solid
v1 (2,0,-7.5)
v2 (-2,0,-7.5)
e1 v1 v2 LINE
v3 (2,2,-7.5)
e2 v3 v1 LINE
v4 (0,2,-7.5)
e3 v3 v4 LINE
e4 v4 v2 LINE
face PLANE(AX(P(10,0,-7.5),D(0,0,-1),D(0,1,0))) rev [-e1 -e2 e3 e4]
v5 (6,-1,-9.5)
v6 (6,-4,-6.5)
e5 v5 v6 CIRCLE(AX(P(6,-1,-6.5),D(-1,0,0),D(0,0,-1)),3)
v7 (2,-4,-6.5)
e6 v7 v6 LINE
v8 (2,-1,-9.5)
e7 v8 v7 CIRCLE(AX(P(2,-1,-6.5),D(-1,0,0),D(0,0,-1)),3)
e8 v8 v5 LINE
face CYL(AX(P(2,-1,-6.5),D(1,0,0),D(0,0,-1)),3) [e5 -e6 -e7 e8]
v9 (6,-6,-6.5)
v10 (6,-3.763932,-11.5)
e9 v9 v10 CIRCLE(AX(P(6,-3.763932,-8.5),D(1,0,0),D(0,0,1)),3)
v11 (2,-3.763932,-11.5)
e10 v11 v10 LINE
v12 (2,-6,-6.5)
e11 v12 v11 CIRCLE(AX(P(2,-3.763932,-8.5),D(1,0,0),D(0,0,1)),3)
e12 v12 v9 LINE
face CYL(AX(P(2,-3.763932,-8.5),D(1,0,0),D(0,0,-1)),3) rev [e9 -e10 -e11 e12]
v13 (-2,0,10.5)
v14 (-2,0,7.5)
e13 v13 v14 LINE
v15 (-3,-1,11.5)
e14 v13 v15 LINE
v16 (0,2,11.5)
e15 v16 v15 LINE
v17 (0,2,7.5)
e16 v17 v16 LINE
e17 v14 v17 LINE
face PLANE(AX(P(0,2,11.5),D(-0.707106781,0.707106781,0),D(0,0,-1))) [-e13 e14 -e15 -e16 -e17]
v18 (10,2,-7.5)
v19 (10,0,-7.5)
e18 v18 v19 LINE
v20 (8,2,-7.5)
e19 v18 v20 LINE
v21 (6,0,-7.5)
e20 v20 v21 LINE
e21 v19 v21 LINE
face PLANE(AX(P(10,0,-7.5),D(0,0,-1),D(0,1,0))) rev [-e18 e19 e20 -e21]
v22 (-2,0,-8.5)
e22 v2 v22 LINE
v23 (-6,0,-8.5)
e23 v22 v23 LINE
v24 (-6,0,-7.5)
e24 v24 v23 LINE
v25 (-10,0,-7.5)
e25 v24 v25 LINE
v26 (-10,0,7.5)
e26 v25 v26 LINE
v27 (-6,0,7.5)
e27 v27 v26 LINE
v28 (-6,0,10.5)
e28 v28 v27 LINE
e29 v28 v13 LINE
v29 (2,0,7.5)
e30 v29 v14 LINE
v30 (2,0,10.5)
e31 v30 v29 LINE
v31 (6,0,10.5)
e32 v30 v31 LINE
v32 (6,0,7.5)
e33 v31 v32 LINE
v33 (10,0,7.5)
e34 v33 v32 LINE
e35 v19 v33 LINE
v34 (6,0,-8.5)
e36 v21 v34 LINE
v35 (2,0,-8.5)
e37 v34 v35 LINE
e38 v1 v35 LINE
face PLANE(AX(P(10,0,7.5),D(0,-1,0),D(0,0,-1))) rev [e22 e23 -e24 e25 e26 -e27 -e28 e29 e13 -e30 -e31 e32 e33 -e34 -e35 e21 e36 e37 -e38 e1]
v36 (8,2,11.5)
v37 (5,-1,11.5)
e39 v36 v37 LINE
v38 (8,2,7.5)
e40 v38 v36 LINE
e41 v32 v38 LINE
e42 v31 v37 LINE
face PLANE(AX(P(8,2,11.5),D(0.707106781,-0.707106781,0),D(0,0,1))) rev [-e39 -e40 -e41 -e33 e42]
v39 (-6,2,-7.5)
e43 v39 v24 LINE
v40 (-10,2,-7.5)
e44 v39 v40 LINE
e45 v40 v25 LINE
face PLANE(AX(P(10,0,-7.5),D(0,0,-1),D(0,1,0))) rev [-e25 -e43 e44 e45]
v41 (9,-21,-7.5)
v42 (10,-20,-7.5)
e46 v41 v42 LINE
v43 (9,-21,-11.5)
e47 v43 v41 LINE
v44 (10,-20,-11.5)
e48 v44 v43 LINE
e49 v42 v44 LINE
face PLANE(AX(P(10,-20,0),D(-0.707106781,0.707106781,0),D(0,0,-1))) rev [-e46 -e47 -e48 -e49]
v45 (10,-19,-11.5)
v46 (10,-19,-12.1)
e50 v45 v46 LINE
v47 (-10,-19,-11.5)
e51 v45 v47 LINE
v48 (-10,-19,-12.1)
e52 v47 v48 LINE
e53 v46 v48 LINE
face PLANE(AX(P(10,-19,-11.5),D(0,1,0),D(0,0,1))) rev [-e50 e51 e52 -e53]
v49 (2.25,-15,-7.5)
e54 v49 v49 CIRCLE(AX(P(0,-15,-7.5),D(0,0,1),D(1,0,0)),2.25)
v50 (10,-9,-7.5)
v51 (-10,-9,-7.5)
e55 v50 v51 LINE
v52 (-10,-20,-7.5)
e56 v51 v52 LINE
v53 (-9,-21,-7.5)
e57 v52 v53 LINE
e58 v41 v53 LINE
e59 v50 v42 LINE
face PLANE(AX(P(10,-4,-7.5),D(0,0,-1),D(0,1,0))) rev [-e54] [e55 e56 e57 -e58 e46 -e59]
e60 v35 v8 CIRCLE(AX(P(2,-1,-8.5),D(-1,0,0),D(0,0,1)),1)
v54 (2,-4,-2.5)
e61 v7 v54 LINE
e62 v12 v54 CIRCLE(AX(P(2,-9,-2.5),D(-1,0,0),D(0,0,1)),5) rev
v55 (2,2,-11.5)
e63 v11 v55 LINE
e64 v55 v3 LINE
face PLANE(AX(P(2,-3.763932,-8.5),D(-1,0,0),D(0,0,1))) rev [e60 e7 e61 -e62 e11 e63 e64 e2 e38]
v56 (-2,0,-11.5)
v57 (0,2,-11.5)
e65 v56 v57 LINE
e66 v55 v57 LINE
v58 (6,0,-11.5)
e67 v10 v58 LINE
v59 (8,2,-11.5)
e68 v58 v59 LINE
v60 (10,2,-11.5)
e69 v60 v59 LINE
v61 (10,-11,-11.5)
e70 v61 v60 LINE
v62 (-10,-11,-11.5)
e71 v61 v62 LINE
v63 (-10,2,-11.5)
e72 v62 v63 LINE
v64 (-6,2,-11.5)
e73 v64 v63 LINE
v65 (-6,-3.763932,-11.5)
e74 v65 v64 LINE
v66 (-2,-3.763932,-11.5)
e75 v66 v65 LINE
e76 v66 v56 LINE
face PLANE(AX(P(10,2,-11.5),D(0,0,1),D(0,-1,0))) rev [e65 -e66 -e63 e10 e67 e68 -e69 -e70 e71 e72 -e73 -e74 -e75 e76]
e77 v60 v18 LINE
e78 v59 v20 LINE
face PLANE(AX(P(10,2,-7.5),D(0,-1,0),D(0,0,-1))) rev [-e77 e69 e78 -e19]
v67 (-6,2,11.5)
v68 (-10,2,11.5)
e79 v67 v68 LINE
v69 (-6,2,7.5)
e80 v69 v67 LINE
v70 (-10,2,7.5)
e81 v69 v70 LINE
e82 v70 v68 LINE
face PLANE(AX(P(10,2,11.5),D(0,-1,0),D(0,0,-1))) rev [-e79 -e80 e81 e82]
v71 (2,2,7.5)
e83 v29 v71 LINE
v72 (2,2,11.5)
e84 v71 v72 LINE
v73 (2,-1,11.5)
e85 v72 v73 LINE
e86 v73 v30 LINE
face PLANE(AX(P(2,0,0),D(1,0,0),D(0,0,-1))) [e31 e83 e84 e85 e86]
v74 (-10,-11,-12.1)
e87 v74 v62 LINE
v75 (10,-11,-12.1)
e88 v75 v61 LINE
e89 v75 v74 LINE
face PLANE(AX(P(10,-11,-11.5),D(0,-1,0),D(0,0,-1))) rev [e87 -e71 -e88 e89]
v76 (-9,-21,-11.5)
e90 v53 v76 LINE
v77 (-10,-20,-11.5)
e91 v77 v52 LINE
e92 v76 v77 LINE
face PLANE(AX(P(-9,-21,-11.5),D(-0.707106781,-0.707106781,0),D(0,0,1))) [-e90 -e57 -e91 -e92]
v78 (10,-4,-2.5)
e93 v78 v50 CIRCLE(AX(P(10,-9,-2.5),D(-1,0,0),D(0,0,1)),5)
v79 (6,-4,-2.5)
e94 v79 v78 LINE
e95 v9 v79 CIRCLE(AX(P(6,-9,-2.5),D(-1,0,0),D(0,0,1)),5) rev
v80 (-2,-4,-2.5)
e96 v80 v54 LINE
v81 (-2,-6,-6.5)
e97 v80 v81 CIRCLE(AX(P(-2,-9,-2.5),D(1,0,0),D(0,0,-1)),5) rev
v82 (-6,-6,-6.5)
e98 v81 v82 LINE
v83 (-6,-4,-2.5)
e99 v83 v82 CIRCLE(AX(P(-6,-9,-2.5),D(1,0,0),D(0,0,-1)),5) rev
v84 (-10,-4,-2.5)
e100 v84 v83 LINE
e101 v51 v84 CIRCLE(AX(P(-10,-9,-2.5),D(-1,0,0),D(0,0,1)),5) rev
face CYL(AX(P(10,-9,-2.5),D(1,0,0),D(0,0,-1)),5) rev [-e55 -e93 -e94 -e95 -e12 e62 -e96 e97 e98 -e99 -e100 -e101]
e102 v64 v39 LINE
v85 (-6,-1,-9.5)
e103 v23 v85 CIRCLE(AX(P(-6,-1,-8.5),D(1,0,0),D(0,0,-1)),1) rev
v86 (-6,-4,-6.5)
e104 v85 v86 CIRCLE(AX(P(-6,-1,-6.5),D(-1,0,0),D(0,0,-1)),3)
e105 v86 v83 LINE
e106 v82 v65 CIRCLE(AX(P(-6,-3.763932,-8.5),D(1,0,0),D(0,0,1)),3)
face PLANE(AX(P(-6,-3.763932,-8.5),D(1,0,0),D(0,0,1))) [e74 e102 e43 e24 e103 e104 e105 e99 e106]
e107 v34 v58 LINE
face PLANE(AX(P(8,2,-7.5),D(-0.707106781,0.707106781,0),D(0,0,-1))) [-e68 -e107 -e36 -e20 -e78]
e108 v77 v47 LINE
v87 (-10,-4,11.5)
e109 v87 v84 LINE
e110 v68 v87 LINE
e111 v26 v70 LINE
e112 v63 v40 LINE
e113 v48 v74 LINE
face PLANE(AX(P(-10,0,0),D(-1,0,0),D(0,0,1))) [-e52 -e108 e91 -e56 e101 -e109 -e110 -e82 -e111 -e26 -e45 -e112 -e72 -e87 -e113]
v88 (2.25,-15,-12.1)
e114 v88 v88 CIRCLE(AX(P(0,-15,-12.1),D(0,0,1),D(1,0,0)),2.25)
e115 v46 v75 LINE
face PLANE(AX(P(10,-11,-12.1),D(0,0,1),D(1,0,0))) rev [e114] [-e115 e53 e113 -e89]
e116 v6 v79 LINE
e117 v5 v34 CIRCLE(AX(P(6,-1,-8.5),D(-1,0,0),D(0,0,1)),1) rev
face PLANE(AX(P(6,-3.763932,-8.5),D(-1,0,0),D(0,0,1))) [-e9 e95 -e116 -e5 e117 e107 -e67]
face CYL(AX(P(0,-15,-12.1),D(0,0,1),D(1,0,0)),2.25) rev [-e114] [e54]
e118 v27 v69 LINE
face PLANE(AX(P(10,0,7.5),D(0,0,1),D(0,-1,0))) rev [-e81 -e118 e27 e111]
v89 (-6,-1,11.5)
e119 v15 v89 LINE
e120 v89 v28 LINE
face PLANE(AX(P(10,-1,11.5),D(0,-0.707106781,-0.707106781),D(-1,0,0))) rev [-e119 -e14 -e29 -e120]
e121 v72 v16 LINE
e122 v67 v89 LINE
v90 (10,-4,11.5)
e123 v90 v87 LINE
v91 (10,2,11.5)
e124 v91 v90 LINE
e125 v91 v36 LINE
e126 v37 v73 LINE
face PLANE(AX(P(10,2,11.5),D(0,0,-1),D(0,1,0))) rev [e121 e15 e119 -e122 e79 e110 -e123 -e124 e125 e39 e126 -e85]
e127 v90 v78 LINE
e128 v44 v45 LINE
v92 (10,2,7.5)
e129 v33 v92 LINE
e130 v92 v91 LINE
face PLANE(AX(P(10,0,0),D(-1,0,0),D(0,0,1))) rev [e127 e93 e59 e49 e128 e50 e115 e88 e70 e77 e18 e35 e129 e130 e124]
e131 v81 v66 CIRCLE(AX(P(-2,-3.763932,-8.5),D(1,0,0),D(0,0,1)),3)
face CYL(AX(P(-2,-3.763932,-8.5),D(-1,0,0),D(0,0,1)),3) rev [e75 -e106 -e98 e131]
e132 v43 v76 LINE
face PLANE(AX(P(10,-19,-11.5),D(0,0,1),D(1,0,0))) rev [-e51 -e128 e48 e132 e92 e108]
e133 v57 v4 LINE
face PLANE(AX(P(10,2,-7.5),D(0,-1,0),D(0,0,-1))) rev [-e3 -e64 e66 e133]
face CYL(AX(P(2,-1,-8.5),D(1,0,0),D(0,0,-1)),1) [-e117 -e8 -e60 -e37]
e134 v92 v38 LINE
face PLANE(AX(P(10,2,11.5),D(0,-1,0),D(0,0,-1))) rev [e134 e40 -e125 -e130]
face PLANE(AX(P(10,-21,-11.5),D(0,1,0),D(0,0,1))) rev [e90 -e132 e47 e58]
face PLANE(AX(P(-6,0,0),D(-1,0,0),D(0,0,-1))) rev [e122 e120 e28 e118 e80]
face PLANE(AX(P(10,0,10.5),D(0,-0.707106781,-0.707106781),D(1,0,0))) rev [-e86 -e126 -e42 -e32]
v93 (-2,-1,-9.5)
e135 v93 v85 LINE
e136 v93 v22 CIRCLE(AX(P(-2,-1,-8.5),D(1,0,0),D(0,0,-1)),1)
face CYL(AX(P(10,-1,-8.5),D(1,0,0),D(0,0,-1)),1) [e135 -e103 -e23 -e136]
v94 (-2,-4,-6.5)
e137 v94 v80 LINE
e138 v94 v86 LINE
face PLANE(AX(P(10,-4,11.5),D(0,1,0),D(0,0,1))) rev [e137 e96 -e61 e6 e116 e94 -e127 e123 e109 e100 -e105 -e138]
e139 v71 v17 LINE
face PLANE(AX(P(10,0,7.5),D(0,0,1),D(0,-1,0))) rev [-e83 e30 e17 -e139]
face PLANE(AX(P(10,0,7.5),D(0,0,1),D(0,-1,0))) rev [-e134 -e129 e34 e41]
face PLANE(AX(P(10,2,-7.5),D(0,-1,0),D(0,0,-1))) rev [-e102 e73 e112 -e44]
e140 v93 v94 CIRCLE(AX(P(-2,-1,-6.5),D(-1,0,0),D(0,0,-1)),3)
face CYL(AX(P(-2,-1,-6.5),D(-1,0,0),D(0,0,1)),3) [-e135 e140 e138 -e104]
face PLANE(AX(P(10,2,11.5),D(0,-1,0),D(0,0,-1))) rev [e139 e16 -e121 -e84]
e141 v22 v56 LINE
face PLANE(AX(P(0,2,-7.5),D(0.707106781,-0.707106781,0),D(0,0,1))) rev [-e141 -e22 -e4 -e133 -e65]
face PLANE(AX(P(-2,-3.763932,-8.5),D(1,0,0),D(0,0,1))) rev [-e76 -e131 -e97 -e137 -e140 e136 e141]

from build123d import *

# Parameters (mm, degrees)
BOSS_EXTRUDE1_DEPTH  = 10
SKETCH2_R            = 2.25
CUT_EXTRUDE1_DEPTH   = 31.033314835
CHAMFER4_SIZE        = 1
FILLET1_R            = 5
CUT_EXTRUDE2_START   = 4
SKETCH3_W            = 4
SKETCH3_H            = 2
CUT_EXTRUDE2_DEPTH   = 2
FILLET2_R            = 1
FILLET2_OF_MIRROR1_R = 1
CHAMFER5_SIZE        = 2
CHAMFER6_START       = -6
CHAMFER6_DEPTH       = 4
CHAMFER6_START_2     = 2
CHAMFER6_2_DEPTH     = 4
CHAMFER6_START_3     = -1.414213562
CHAMFER6_3_DEPTH     = 2.828427124
CHAMFER6_START_4     = 4.242640687
CHAMFER6_4_DEPTH     = 1.757359313


with BuildPart() as part:
    # Sketch1 → Boss-Extrude1 (new, symmetric)
    with BuildSketch(Plane(origin=(0, 0, 0), x_dir=(0, 0, -1), z_dir=(1, 0, 0))):
        Polygon((7.5, 2), (11.5, 2), (11.5, -11), (12.1, -11), (12.1, -19), (11.5, -19), (11.5, -21), (7.5, -21), (7.5, -4), (-11.5, -4), (-11.5, 2), (-7.5, 2), (-7.5, 0), (7.5, 0), align=None)
    extrude(amount=BOSS_EXTRUDE1_DEPTH, both=True)

    # Sketch2 → Cut-Extrude1 (cut, through all)
    with BuildSketch(Plane.XY.offset(-7.5)):
        with Locations((0, -15)):
            Circle(SKETCH2_R)
    extrude(amount=-CUT_EXTRUDE1_DEPTH, mode=Mode.SUBTRACT)

    # Chamfer4
    chamfer4_edges = [part.edges().sort_by_distance(p)[0] for p in [
        (-10, -21, -9.5),
        (10, -21, -9.5),
    ]]
    chamfer(chamfer4_edges, length=CHAMFER4_SIZE)

    # Fillet1
    fillet1_edges = [part.edges().sort_by_distance(p)[0] for p in [
        (0, -4, -7.5),
    ]]
    fillet(fillet1_edges, radius=FILLET1_R)

    # Sketch3 → Cut-Extrude2 (cut, symmetric)
    with BuildSketch(Plane(origin=(0, 0, 0), x_dir=(0, 0, -1), z_dir=(1, 0, 0)).offset(CUT_EXTRUDE2_START)):
        with BuildLine():
            Line((2.5, -4), (6.5, -4))
            ThreePointArc((6.5, -4), (8.621320344, -3.121320344), (9.5, -1))
            Line((9.5, -1), (9.5, 0))
            Line((9.5, 0), (7.5, 0))
            Line((7.5, 0), (7.5, 2))
            Line((7.5, 2), (11.5, 2))
            Line((11.5, 2), (11.5, -1))
            Line((11.5, -1), (11.5, -3.763932023))
            ThreePointArc((11.5, -3.763932023), (9.724744871, -6.50254481), (6.5, -6))
            Line((6.5, -6), (2.5, -4))
        make_face()
        with Locations((-9.5, 1)):
            Rectangle(SKETCH3_W, SKETCH3_H)
    cut_extrude2 = extrude(amount=CUT_EXTRUDE2_DEPTH, both=True, mode=Mode.SUBTRACT)

    # Fillet2
    fillet2_edges = [part.edges().sort_by_distance(p)[0] for p in [
        (4, 0, -9.5),
    ]]
    fillet(fillet2_edges, radius=FILLET2_R - 0.0001)  # a hair under: the kernel refuses the full size

    # Mirror1: Cut-Extrude2 across plane
    add(cut_extrude2.mirror(Plane(origin=(0, 0, 0), x_dir=(0, 0, 1), z_dir=(1, 0, 0))), mode=Mode.SUBTRACT)

    # Fillet2 of Mirror1
    fillet2_of_mirror1_edges = [part.edges().sort_by_distance(p)[0] for p in [
        (-4, 0, -9.5),
    ]]
    fillet(fillet2_of_mirror1_edges, radius=FILLET2_OF_MIRROR1_R - 0.0001)  # a hair under: the kernel refuses the full size

    # Chamfer5
    chamfer5_edges = [part.edges().sort_by_distance(p)[0] for p in [
        (6, 2, 9.5),
        (6, 2, -9.5),
        (-2, 2, -9.5),
        (-2, 2, 9.5),
    ]]
    chamfer(chamfer5_edges, length=CHAMFER5_SIZE - 0.0001)  # a hair under: the kernel refuses the full size

    # Chamfer6: read off the stored shape, not the designer's step
    # Chamfer6 outline → Chamfer6 (cut)
    with BuildSketch(Plane.YZ.offset(CHAMFER6_START)):
        Polygon((0, 11.5), (-1, 11.5), (0, 10.5), align=None)
    extrude(amount=CHAMFER6_DEPTH, mode=Mode.SUBTRACT)

    # Chamfer6 2 outline → Chamfer6 2 (cut)
    with BuildSketch(Plane.YZ.offset(CHAMFER6_START_2)):
        Polygon((0, 11.5), (-1, 11.5), (0, 10.5), align=None)
    extrude(amount=CHAMFER6_2_DEPTH, mode=Mode.SUBTRACT)

    # Chamfer6 3 outline → Chamfer6 3 (add)
    with BuildSketch(Plane(origin=(0, 0, 0), x_dir=(0.7071067811865471, 0.707106781186548, 0), z_dir=(0.707106781186548, -0.707106781186547, 0)).offset(CHAMFER6_START_3)):
        Polygon((-1.414213562, 7.5), (1.414213562, 7.5), (1.414213562, 11.5), (-2.828427125, 11.5), (-1.414213562, 10.5), align=None)
    extrude(amount=CHAMFER6_3_DEPTH)

    # Chamfer6 4 outline → Chamfer6 4 (add)
    with BuildSketch(Plane(origin=(0, 0, 0), x_dir=(0.7071067811865471, 0.707106781186548, 0), z_dir=(0.707106781186548, -0.707106781186547, 0)).offset(CHAMFER6_START_4)):
        Polygon((4.242640687, 7.5), (7.071067812, 7.5), (7.071067812, 11.5), (2.828427125, 11.5), (4.242640687, 10.5), align=None)
    extrude(amount=CHAMFER6_4_DEPTH)


solid = part.part
